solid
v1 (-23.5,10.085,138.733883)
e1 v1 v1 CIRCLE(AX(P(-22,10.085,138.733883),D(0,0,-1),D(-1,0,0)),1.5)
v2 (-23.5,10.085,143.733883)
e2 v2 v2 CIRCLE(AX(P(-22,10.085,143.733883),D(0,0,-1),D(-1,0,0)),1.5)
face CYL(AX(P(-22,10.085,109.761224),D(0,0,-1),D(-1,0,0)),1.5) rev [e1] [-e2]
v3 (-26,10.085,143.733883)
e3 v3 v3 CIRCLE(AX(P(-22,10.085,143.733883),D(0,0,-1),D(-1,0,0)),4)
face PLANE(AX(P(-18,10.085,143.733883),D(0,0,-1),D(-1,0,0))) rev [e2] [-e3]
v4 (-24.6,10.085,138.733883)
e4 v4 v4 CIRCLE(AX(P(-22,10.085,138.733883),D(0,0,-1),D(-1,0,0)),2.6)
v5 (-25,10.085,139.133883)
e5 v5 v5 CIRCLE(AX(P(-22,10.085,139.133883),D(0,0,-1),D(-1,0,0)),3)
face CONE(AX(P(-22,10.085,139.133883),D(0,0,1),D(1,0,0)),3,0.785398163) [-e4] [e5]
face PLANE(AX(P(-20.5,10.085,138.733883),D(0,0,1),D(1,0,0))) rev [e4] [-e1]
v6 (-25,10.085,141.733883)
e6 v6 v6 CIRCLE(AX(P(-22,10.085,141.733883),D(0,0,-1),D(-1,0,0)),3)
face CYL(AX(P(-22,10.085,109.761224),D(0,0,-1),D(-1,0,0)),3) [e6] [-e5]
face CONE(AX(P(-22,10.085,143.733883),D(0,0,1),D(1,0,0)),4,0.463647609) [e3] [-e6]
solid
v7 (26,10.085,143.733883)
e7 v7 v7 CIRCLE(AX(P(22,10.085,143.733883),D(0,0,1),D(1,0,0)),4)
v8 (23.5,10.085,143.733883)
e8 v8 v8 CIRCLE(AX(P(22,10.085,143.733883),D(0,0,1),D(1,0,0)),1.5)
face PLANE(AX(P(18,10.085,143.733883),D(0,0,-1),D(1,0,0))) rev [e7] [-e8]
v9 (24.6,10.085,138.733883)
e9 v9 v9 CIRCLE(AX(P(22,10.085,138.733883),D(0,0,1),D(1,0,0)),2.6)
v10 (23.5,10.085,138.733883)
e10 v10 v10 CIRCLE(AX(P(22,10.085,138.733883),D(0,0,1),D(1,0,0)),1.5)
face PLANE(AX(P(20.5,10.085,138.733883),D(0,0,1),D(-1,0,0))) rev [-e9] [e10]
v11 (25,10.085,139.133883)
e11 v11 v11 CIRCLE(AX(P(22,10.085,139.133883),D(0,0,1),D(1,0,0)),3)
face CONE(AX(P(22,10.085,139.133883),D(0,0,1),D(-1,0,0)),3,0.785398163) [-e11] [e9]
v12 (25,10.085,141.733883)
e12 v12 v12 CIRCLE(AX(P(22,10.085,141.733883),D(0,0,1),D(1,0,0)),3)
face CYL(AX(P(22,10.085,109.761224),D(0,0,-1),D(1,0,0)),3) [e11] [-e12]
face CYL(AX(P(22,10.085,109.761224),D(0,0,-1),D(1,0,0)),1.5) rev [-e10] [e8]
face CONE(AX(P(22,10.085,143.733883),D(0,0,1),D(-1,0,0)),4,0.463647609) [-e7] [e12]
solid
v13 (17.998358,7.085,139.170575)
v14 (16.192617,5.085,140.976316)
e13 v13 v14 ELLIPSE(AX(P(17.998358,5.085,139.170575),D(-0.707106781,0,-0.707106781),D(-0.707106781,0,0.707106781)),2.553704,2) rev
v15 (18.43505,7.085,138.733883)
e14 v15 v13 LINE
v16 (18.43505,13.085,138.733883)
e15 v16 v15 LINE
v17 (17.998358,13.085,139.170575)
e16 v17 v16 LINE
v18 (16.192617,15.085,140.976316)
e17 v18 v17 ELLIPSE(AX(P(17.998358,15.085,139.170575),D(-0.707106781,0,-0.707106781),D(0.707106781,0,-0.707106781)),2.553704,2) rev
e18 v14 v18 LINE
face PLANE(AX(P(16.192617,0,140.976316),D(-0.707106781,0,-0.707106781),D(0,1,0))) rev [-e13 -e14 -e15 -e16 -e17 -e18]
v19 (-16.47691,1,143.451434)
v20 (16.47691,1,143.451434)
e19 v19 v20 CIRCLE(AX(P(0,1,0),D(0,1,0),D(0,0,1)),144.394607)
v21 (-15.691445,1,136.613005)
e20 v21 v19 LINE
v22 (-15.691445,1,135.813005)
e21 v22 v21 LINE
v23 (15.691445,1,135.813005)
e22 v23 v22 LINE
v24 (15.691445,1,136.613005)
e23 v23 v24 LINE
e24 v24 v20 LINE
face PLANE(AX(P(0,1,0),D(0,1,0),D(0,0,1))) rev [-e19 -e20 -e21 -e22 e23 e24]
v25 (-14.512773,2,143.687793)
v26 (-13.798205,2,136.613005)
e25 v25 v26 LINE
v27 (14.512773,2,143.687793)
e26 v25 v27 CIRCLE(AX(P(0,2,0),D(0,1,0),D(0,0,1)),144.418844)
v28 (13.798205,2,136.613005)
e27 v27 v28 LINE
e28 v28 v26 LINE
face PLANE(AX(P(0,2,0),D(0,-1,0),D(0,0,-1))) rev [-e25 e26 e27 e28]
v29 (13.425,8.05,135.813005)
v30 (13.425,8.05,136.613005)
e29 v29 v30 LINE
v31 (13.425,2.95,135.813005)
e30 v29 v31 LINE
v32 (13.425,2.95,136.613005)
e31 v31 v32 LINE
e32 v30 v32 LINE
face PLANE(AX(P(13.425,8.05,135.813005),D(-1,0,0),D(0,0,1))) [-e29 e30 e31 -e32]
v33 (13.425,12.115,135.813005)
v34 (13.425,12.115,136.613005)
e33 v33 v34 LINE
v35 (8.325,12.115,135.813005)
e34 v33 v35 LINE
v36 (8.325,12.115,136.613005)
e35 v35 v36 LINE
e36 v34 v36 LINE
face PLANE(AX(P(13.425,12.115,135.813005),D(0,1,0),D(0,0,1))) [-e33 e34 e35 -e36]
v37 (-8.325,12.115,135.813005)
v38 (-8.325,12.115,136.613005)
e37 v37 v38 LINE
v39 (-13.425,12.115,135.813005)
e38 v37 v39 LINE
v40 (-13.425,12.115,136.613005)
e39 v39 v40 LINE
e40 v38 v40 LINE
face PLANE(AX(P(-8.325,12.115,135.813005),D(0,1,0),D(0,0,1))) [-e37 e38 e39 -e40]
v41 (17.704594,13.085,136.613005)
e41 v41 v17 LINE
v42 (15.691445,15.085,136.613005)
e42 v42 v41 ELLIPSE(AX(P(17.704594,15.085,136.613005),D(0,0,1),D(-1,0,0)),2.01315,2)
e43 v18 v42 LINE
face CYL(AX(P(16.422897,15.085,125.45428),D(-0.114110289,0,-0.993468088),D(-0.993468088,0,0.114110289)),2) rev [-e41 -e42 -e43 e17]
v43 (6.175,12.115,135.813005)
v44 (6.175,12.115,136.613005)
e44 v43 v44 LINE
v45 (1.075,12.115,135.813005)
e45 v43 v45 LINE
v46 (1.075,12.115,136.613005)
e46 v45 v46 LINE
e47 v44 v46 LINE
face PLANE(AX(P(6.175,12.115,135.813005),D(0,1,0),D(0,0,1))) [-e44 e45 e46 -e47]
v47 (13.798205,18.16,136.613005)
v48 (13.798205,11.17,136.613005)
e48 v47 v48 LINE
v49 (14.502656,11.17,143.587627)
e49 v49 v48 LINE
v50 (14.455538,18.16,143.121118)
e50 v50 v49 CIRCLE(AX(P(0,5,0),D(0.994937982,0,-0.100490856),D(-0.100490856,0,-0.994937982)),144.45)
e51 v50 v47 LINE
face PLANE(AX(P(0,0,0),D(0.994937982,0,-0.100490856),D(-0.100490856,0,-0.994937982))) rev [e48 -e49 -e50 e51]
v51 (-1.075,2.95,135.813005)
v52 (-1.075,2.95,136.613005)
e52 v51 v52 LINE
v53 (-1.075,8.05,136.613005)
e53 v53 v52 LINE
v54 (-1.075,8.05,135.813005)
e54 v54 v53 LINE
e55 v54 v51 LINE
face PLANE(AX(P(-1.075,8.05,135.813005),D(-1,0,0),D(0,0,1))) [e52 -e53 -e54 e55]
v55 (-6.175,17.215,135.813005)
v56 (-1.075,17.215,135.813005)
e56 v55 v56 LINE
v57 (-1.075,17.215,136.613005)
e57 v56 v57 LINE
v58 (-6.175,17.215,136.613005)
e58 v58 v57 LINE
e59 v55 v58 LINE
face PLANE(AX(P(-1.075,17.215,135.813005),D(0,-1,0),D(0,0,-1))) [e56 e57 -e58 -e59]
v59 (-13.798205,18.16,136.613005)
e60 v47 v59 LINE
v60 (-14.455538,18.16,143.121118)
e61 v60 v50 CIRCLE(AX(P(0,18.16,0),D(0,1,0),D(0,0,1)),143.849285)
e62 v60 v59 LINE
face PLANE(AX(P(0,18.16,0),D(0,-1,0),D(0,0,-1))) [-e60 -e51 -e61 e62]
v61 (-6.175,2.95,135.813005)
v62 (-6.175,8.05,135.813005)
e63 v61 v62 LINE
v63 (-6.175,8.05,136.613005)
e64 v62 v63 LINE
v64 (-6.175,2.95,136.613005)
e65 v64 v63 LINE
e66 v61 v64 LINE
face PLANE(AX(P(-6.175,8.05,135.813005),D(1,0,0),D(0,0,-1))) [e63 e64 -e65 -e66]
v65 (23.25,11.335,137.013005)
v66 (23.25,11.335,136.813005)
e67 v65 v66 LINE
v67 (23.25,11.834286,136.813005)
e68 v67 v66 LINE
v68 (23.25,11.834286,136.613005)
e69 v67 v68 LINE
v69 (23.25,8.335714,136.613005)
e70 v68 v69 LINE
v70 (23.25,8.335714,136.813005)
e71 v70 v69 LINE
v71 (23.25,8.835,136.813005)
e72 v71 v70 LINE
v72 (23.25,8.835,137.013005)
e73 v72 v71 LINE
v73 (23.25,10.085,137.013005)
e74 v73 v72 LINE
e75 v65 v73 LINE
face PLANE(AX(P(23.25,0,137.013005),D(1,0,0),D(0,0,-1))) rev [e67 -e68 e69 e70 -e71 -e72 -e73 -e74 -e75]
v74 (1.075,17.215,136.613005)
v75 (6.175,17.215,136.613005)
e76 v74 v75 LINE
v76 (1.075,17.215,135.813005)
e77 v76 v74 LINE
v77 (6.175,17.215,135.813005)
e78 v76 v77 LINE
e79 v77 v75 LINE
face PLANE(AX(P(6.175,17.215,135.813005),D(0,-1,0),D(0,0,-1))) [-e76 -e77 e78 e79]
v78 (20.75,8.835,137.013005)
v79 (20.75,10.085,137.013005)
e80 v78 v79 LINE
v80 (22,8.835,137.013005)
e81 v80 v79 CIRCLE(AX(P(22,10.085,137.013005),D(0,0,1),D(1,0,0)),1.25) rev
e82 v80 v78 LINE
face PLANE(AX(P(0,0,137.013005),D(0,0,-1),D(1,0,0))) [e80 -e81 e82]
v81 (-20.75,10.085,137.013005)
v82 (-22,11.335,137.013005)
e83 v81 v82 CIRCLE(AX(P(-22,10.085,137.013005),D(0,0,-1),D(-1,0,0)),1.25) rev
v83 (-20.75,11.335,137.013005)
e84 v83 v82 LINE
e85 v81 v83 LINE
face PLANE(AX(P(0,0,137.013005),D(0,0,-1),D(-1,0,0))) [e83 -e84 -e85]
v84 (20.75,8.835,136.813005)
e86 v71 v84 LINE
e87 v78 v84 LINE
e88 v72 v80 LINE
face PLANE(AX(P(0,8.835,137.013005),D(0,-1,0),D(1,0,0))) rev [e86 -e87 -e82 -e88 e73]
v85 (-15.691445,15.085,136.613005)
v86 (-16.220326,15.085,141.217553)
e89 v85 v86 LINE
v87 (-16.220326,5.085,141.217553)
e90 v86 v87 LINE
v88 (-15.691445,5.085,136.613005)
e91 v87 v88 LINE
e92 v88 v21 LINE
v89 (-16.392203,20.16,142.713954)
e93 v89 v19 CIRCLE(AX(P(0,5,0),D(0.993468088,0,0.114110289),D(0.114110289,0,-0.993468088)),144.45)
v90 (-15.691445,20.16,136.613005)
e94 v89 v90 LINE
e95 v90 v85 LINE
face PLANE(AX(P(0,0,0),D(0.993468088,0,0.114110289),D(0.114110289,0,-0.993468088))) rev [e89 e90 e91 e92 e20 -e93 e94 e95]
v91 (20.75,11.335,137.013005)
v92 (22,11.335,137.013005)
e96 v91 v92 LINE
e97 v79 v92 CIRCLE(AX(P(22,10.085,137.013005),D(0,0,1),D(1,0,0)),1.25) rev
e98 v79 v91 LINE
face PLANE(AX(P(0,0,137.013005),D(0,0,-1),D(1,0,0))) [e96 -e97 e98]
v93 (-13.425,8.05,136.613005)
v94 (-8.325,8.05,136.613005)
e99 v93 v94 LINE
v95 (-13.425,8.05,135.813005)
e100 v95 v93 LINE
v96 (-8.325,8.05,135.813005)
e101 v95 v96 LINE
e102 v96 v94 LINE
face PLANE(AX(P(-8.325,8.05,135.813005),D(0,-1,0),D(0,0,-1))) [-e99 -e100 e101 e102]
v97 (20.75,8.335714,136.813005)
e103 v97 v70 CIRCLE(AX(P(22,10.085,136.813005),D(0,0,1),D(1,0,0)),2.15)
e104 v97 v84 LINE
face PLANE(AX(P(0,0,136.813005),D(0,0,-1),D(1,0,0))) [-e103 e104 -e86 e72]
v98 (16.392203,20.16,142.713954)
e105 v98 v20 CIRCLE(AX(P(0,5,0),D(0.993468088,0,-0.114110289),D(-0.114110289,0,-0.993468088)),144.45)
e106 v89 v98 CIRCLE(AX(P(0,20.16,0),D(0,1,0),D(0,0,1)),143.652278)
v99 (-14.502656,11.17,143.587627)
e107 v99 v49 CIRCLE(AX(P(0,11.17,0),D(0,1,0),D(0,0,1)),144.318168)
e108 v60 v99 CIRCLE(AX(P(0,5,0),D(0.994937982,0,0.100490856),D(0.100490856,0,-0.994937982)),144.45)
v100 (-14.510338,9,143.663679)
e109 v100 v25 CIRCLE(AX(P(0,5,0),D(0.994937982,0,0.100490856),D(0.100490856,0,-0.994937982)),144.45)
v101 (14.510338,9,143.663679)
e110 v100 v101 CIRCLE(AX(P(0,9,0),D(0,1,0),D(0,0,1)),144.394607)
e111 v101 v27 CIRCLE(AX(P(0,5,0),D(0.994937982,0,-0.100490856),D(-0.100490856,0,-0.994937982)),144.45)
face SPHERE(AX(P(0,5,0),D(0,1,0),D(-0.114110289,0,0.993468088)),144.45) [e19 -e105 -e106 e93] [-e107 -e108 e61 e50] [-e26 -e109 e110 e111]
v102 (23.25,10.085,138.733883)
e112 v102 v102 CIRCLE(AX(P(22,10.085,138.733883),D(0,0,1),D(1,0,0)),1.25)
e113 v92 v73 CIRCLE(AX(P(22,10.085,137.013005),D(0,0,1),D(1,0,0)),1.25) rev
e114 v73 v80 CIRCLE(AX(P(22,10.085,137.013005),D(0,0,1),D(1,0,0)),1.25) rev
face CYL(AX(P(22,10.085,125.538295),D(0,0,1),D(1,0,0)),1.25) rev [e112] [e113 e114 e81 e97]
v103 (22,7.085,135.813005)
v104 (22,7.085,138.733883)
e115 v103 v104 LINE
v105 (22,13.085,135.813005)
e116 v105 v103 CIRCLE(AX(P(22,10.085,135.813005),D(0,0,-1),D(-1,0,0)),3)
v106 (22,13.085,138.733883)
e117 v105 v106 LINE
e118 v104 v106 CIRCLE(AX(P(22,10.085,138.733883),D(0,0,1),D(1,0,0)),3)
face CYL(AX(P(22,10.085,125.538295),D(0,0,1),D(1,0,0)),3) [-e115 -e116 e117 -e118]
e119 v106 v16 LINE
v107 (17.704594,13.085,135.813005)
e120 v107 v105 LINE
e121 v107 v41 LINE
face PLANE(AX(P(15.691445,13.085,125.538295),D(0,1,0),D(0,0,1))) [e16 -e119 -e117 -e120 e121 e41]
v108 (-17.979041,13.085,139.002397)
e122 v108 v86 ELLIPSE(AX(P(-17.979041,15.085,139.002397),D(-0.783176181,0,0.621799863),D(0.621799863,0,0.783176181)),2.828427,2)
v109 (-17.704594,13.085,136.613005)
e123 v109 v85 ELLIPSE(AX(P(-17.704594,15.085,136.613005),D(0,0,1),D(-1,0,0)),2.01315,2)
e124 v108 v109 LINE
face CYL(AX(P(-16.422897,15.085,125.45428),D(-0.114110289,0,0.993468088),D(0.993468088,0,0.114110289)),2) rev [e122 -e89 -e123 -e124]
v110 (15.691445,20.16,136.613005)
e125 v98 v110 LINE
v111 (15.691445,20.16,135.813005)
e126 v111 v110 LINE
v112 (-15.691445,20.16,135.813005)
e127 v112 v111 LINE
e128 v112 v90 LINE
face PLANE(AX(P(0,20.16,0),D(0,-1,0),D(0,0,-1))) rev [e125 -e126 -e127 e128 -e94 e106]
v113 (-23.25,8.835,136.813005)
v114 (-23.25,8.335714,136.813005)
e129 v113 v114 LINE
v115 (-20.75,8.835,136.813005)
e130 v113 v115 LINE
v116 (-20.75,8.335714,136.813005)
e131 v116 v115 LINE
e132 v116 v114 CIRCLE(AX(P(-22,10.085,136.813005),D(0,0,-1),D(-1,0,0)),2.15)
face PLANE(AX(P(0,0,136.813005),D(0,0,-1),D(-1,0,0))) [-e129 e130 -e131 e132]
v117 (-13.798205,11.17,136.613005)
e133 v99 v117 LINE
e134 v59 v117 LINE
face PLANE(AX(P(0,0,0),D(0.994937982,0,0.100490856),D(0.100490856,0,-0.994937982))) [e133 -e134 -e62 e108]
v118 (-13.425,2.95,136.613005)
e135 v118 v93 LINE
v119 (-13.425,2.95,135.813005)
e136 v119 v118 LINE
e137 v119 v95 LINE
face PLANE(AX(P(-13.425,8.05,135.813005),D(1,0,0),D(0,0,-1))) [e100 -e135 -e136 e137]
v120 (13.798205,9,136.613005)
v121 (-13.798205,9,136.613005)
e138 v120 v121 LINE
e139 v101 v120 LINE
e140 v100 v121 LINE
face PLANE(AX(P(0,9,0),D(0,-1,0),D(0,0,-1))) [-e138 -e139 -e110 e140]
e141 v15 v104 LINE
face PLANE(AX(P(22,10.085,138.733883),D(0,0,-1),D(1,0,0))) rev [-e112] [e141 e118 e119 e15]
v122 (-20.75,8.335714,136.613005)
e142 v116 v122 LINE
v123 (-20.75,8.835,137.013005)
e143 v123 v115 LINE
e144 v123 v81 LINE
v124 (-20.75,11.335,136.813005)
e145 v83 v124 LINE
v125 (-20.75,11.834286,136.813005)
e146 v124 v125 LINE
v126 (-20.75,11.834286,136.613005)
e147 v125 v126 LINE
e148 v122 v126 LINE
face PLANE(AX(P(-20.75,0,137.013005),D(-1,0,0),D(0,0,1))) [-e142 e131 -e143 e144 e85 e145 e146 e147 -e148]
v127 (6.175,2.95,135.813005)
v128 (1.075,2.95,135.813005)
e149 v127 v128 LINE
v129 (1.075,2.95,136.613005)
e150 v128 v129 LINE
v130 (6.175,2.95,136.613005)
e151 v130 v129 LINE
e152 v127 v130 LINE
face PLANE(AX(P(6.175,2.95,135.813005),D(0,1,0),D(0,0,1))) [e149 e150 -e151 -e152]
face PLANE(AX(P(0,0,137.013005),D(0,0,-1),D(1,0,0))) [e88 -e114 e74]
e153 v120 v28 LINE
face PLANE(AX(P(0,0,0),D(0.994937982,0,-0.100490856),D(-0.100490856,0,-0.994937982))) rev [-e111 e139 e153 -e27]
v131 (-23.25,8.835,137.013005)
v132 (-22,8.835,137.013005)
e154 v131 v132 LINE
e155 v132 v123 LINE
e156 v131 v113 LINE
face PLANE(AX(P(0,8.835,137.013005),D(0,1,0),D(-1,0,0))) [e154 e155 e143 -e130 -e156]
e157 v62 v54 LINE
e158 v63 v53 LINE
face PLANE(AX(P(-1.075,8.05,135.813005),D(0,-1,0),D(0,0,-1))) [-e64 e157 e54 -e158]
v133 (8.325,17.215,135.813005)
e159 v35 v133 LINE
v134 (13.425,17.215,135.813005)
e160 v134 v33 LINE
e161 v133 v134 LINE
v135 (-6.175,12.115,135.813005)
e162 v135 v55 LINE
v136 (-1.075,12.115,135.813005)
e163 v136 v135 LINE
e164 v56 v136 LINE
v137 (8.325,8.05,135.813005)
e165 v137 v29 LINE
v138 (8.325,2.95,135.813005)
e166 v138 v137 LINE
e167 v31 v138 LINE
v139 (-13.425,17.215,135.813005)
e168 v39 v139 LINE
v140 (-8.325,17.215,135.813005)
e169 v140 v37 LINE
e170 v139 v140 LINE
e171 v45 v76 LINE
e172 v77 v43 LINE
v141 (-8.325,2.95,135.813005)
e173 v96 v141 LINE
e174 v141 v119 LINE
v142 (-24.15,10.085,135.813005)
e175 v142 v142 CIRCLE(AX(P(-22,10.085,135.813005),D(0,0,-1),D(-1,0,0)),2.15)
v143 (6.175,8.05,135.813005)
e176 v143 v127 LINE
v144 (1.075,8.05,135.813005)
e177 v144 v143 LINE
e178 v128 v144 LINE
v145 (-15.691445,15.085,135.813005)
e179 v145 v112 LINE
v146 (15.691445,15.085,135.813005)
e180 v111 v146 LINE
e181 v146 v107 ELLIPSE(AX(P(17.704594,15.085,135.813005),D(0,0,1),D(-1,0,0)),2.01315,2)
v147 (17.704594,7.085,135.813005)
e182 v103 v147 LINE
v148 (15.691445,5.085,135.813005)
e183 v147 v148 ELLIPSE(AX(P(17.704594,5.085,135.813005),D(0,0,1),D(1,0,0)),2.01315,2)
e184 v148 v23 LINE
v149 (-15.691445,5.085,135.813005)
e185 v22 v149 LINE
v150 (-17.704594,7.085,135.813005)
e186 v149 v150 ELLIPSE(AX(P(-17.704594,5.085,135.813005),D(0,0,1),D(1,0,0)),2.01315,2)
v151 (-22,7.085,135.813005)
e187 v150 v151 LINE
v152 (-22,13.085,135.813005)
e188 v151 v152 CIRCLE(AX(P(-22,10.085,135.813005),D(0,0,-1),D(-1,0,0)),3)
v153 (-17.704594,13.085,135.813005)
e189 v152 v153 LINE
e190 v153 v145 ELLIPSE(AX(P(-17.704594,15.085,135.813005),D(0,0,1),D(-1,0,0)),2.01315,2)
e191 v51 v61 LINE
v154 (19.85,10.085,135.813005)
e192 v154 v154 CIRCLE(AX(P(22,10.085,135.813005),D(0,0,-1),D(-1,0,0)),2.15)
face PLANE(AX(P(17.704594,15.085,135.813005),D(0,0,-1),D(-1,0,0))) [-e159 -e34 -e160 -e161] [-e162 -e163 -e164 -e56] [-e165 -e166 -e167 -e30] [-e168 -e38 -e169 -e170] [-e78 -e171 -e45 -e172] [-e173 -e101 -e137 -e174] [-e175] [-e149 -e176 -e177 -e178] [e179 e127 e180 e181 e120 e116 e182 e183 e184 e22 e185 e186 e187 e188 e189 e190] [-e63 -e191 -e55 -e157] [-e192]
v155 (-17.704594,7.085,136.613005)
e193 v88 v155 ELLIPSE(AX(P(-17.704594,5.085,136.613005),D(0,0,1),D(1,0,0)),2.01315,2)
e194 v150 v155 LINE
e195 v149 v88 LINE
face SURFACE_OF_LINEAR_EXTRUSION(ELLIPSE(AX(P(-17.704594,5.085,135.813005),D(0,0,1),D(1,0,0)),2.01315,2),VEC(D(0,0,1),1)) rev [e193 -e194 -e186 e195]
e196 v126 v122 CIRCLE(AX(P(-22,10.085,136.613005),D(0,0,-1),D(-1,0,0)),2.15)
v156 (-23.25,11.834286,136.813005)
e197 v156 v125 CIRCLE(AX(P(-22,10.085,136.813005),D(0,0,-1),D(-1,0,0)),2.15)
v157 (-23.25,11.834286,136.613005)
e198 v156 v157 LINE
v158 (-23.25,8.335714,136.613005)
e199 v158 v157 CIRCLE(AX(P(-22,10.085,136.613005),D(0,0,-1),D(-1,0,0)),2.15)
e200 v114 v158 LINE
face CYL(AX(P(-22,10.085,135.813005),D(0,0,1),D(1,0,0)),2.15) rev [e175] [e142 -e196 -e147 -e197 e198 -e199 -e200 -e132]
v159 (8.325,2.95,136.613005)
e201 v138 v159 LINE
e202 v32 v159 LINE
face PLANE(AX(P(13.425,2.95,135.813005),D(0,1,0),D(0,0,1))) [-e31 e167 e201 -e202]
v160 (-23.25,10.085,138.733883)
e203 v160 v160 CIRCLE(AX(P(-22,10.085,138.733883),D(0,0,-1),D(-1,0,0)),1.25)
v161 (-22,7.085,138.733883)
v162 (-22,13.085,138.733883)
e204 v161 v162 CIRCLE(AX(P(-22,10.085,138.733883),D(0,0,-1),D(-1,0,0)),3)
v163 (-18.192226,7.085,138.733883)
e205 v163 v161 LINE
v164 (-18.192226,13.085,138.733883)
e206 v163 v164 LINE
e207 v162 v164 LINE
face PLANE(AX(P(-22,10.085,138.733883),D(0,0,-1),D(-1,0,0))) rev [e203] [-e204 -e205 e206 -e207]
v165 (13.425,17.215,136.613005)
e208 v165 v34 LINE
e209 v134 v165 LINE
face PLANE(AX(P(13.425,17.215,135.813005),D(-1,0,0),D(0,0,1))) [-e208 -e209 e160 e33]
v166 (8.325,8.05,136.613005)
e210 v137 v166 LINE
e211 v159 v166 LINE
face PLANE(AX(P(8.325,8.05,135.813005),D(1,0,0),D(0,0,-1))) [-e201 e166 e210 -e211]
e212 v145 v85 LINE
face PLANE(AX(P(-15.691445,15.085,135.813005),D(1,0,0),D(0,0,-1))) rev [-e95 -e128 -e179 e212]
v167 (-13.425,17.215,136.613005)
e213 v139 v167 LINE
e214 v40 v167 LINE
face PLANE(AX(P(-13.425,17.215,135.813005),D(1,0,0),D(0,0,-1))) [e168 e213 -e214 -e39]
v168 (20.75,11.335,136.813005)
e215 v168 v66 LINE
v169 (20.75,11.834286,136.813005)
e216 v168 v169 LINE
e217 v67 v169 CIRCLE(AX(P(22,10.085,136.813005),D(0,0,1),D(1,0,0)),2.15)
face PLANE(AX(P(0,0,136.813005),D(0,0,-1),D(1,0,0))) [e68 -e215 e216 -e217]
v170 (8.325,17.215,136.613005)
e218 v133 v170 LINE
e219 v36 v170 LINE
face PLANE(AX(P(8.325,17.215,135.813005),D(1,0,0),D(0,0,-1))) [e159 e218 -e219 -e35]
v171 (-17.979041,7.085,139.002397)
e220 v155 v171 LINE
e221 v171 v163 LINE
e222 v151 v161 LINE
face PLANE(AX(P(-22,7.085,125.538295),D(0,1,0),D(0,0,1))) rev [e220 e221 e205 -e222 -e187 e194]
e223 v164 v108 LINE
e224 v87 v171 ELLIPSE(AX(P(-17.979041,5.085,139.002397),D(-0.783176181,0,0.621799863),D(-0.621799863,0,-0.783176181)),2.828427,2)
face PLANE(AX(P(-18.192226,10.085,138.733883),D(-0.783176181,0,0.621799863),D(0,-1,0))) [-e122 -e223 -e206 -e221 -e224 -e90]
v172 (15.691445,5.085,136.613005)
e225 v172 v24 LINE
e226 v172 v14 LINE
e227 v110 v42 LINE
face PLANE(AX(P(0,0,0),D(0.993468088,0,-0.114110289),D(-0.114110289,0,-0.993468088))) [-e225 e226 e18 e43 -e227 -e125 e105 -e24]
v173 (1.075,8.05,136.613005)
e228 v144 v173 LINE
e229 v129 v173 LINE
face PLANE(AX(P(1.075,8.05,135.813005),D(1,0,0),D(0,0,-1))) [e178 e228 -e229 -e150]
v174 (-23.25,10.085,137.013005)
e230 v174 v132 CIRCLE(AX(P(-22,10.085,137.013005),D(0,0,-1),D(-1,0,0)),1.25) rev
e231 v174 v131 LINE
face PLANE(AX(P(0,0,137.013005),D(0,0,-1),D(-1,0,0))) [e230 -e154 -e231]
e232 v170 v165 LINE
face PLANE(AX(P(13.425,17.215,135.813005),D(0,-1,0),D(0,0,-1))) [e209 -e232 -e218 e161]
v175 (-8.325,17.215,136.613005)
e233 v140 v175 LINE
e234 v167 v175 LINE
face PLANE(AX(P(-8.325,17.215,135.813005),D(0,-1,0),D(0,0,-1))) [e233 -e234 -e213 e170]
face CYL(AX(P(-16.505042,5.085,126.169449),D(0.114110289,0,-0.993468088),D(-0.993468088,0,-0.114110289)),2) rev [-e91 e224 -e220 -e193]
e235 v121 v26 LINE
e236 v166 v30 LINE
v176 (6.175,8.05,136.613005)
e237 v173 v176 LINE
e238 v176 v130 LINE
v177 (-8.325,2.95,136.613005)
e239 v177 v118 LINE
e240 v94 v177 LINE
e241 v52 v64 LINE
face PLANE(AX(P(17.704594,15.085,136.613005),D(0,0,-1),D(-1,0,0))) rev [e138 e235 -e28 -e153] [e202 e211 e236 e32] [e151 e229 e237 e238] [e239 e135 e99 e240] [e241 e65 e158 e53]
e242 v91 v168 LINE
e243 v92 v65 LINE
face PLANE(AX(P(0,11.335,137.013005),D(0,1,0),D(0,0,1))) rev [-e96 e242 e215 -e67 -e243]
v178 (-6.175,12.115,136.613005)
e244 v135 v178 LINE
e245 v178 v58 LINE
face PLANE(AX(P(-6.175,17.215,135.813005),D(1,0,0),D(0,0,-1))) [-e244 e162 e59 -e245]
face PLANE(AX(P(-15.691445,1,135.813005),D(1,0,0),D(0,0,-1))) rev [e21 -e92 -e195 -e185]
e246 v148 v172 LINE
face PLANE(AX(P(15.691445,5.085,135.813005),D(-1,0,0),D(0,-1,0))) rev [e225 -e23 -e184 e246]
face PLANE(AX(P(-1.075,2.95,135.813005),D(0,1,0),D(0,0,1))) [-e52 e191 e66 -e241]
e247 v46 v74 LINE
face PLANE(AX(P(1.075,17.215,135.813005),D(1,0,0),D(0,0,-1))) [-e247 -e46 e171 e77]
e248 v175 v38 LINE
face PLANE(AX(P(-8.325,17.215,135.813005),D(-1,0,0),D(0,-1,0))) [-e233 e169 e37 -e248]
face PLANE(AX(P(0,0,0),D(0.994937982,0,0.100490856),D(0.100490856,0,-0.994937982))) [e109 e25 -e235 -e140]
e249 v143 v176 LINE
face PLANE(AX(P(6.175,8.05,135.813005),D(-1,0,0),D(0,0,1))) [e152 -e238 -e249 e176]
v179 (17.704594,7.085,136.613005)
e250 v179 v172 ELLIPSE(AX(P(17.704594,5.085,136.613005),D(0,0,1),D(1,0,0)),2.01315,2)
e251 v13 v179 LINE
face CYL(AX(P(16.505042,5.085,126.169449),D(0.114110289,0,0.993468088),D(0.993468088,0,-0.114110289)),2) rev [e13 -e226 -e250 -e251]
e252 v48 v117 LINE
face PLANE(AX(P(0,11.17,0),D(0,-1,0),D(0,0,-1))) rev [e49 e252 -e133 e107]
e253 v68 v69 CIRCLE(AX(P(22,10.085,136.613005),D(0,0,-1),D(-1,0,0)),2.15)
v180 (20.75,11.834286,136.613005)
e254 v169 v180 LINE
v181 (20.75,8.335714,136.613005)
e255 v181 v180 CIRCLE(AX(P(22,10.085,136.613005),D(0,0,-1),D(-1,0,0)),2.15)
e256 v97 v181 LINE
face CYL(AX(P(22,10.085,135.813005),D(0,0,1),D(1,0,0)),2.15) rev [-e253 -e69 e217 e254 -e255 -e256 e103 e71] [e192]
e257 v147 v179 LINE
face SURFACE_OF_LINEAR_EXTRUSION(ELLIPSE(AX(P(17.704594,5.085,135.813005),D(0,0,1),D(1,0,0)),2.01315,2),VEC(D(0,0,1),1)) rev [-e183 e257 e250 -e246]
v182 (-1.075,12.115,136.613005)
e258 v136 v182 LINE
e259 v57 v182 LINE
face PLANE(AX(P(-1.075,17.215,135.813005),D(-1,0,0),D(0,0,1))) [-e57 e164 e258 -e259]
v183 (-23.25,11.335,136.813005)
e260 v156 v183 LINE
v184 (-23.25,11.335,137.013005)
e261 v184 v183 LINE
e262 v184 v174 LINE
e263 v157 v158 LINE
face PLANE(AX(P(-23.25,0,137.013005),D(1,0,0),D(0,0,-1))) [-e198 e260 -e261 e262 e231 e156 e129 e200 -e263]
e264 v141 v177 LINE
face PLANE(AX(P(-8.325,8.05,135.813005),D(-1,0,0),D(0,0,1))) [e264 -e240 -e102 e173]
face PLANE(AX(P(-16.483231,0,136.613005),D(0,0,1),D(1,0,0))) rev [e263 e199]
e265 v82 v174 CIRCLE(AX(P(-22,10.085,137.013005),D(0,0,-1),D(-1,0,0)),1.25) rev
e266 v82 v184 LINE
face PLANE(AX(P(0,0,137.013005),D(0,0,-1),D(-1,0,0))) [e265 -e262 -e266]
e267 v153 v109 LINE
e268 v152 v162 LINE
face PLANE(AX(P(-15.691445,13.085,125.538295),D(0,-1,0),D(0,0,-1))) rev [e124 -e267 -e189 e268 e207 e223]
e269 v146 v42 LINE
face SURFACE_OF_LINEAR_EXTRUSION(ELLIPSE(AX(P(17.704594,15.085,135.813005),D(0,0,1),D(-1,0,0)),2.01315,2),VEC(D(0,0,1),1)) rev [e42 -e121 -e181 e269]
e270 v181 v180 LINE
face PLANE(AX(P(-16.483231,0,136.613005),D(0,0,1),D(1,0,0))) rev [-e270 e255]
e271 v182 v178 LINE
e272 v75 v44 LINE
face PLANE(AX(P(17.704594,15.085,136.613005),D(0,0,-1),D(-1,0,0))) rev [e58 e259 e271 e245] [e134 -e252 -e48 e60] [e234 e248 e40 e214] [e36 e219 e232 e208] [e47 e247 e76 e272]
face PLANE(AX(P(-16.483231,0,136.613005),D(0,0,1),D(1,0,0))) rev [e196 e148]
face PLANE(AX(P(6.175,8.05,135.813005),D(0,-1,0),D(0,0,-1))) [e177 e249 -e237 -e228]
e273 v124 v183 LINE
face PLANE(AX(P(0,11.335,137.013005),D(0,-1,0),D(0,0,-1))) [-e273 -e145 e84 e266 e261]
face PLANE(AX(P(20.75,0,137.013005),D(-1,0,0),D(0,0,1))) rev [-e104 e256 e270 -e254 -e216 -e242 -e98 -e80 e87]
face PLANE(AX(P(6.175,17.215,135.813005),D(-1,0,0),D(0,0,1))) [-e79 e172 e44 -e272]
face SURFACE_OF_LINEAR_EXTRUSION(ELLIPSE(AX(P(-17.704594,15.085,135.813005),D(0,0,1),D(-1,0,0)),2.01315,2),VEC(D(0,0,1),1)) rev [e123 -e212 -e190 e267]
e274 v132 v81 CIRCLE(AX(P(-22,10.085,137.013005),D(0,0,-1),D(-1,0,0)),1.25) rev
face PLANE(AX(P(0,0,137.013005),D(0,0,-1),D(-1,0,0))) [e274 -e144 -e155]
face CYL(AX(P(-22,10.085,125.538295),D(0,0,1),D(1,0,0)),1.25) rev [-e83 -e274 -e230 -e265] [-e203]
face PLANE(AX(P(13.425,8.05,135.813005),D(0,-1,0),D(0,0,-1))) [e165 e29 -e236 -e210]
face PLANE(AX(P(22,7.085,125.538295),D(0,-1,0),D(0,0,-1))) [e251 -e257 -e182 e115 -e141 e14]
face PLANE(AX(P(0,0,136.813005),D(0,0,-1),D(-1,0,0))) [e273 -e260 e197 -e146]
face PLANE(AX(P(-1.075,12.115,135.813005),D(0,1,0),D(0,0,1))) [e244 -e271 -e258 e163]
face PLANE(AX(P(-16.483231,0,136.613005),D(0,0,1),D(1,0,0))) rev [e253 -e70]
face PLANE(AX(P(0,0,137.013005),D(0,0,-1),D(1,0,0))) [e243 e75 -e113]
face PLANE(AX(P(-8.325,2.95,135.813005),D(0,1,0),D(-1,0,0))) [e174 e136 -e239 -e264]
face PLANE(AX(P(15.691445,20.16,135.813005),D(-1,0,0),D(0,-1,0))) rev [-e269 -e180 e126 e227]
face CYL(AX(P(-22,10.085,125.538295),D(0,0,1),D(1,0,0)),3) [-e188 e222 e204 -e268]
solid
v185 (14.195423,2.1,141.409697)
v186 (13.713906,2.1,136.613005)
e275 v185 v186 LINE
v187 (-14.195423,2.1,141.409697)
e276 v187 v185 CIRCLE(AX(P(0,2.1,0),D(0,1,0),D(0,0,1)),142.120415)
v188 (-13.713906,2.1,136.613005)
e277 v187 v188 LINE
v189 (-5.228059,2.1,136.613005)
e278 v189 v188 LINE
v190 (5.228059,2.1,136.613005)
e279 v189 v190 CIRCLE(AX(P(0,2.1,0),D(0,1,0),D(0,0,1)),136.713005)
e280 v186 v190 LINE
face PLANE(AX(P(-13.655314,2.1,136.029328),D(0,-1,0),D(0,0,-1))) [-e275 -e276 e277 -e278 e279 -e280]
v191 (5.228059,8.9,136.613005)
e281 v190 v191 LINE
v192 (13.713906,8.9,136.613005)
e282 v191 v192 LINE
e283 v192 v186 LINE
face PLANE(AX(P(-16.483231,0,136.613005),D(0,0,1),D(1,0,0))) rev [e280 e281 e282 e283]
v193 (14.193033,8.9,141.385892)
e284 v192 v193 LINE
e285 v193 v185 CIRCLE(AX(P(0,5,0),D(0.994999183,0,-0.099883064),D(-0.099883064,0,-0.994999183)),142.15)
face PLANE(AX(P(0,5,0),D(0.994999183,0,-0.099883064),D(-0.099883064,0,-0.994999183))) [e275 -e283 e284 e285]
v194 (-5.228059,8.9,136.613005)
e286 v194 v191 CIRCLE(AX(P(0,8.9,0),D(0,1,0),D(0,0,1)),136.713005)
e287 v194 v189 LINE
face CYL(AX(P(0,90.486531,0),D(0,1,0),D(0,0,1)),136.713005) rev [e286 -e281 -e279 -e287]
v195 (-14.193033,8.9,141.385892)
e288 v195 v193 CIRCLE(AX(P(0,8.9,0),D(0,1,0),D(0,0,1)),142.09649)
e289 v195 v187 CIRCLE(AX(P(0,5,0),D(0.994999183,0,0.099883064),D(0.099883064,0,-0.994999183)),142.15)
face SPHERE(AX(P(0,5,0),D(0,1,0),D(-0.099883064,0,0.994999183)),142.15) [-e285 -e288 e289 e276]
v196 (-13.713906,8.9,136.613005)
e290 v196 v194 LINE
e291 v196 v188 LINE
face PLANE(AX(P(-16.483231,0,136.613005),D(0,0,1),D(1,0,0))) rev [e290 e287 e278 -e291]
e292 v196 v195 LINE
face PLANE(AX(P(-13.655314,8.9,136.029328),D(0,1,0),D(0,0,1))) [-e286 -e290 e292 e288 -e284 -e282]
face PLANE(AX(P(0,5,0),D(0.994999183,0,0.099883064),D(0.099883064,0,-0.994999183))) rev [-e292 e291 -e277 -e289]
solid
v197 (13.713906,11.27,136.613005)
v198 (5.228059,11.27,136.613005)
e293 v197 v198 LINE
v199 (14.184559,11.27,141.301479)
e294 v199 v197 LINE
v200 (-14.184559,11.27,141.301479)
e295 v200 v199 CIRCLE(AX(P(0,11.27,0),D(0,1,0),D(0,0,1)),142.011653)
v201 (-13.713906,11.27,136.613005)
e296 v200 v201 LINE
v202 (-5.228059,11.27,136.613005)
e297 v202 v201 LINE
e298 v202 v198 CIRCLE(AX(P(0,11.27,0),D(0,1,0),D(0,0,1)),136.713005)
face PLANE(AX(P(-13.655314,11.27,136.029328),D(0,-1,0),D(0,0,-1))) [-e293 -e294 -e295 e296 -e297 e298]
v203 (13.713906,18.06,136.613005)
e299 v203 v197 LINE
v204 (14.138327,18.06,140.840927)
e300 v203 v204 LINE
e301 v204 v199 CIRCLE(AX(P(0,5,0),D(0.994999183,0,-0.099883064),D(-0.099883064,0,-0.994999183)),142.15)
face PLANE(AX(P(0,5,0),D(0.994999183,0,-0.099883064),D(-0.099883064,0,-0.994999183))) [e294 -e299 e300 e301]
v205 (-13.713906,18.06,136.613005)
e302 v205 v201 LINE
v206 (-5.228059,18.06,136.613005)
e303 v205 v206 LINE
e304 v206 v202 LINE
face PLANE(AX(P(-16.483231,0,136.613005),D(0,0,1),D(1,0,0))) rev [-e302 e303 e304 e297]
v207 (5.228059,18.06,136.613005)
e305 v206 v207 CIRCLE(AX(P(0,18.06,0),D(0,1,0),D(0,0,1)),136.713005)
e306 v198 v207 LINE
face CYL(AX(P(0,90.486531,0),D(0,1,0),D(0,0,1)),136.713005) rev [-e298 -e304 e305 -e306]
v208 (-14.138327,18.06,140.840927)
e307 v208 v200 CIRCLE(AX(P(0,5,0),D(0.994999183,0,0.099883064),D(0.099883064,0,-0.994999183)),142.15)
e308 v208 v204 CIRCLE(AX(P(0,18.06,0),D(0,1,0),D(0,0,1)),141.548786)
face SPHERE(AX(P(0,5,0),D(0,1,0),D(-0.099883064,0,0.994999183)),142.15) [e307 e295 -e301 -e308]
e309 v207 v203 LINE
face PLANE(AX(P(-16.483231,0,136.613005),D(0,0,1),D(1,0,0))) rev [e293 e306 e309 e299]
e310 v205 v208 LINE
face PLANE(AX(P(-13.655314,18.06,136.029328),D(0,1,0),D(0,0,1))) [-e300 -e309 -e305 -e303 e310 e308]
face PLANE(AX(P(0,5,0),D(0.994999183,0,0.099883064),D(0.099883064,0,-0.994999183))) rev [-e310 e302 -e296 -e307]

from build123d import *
from OCP.BRepFilletAPI import BRepFilletAPI_MakeChamfer

# Parameters (mm, degrees)
REVOLVE1_ANGLE          = 13.104621076
CUT_REVOLVE1_ANGLE      = 11.534873692
REVOLVE4_ANGLE          = 11.464873692
CUT_EXTRUDE2_START      = -15.691444559
CUT_EXTRUDE2_OUTLINE_W  = 22.613004813
CUT_EXTRUDE2_OUTLINE_H  = 19.16
CUT_EXTRUDE2_DEPTH      = 31.382889118
BOSS_EXTRUDE3_OUTLINE_R = 1.25
BOSS_EXTRUDE3_DEPTH     = 2.120878311
FILLET1_R               = 2
CHAMFER2_SIZE           = 2.5
CHAMFER2_SIZE2          = 2.257176605
SKETCH11_R              = 2.15
BOSS_EXTRUDE4_DEPTH     = 0.8
CUT_EXTRUDE5_START      = -0.4
CUT_EXTRUDE5_DEPTH      = 0.4
CUT_EXTRUDE6_START      = 136.613004813
CUT_EXTRUDE6_DEPTH      = 0.2
SKETCH13_W              = 5.1
SKETCH13_H              = 5.1
CUT_EXTRUDE7_DEPTH      = 0.8


# Read off the part's stored shape, not the designer's step: Cut-Extrude2, Boss-Extrude3, Cut-Extrude6
with BuildPart() as part:
    # Sketch2 → Revolve1 (revolve, symmetric)
    with BuildSketch(Plane(origin=(0, 0, 0), x_dir=(0, 0, -1), z_dir=(1, 0, 0))) as revolve1_sk:
        with BuildLine():
            Line((-144.394606894, 1), (-116.613004813, 1))
            Line((-116.613004813, 1), (-116.613004813, 20.16))
            Line((-116.613004813, 20.16), (-143.65227774, 20.16))
            ThreePointArc((-143.65227774, 20.16), (-144.341706852, 10.592330743), (-144.394606894, 1))
        make_face()
    revolve(axis=Axis((0, 110.183531328, 0), (0, -1, 0)), revolution_arc=REVOLVE1_ANGLE / 2)
    revolve(revolve1_sk.sketch, axis=Axis((0, 110.183531328, 0), (0, 1, 0)), revolution_arc=REVOLVE1_ANGLE / 2)

    # Sketch2<3> → Cut-Revolve1 (revolve, symmetric, cut)
    with BuildSketch(Plane(origin=(0, 0, 0), x_dir=(0, 0, -1), z_dir=(1, 0, 0))) as cut_revolve1_sk:
        with BuildLine():
            ThreePointArc((-143.849285365, 18.16), (-144.126109058, 14.667842971), (-144.318167948, 11.17))
            Line((-144.318167948, 11.17), (-137.31303574, 11.17))
            ThreePointArc((-137.31303574, 11.17), (-137.111143693, 14.668141466), (-136.820148677, 18.16))
            Line((-136.820148677, 18.16), (-143.849285365, 18.16))
        make_face()
        with BuildLine():
            ThreePointArc((-144.394606894, 9), (-144.449134138, 5.500146838), (-144.418843992, 2))
            Line((-144.418843992, 2), (-137.418843992, 2))
            ThreePointArc((-137.418843992, 2), (-137.450676688, 5.500162179), (-137.393372053, 9))
            Line((-137.393372053, 9), (-144.394606894, 9))
        make_face()
        with BuildLine():
            ThreePointArc((-136.820148677, 18.16), (-137.111143693, 14.668141466), (-137.31303574, 11.17))
            Line((-137.31303574, 11.17), (-136.613004813, 11.17))
            Line((-136.613004813, 11.17), (-136.613004813, 18.16))
            Line((-136.613004813, 18.16), (-136.820148677, 18.16))
        make_face()
        with BuildLine():
            ThreePointArc((-137.393372053, 9), (-137.450676688, 5.500162179), (-137.418843992, 2))
            Line((-137.418843992, 2), (-136.613004813, 2))
            Line((-136.613004813, 2), (-136.613004813, 9))
            Line((-136.613004813, 9), (-137.393372053, 9))
        make_face()
    revolve(axis=Axis((0, 110.183531328, 0), (0, -1, 0)), revolution_arc=CUT_REVOLVE1_ANGLE / 2, mode=Mode.SUBTRACT)
    revolve(cut_revolve1_sk.sketch, axis=Axis((0, 110.183531328, 0), (0, 1, 0)), revolution_arc=CUT_REVOLVE1_ANGLE / 2, mode=Mode.SUBTRACT)


with BuildPart() as body_2:
    # Sketch10 → Revolve4 (revolve, symmetric)
    with BuildSketch(Plane(origin=(0, 0, 0), x_dir=(0, 0, -1), z_dir=(1, 0, 0))) as revolve4_sk:
        with BuildLine():
            Line((-136.713004813, 18.06), (-141.548786289, 18.06))
            ThreePointArc((-141.548786289, 18.06), (-141.820861348, 14.667770498), (-142.011653043, 11.27))
            Line((-142.011653043, 11.27), (-136.713004813, 11.27))
            Line((-136.713004813, 11.27), (-136.713004813, 18.06))
        make_face()
        with BuildLine():
            Line((-136.713004813, 8.9), (-142.096490104, 8.9))
            ThreePointArc((-142.096490104, 8.9), (-142.149120141, 5.500143086), (-142.120415493, 2.1))
            Line((-142.120415493, 2.1), (-136.713004813, 2.1))
            Line((-136.713004813, 2.1), (-136.713004813, 8.9))
        make_face()
    revolve(axis=Axis((0, 90.486530569, 0), (0, -1, 0)), revolution_arc=REVOLVE4_ANGLE / 2)
    revolve(revolve4_sk.sketch, axis=Axis((0, 90.486530569, 0), (0, 1, 0)), revolution_arc=REVOLVE4_ANGLE / 2)


with BuildPart() as cut_extrude2_tool:
    # Cut-Extrude2 outline → Cut-Extrude2 (new body)
    with BuildSketch(Plane(origin=(0, 0, 0), x_dir=(0, 0, -1), z_dir=(1, 0, 0)).offset(CUT_EXTRUDE2_START)):
        with Locations((-125.306502407, 10.58)):
            Rectangle(CUT_EXTRUDE2_OUTLINE_W, CUT_EXTRUDE2_OUTLINE_H)
    extrude(amount=CUT_EXTRUDE2_DEPTH)


with BuildPart() as part_1:
    add(part.part)

    # Cut-Extrude2: cut by cut_extrude2_tool
    add(cut_extrude2_tool.part, mode=Mode.SUBTRACT)

    # Boss-Extrude3 outline → Boss-Extrude3 (add)
    with BuildSketch(Plane(origin=(0, 0, 138.733883125), x_dir=(-1, 0, 0), z_dir=(0, 0, -1))):
        with BuildLine():
            Line((22, 13.085), (15.691444559, 13.085))
            Line((15.691444559, 13.085), (15.691444559, 7.085))
            Line((15.691444559, 7.085), (22, 7.085))
            ThreePointArc((22, 7.085), (25, 10.085), (22, 13.085))
        make_face()
        with Locations((22, 10.085)):
            Circle(BOSS_EXTRUDE3_OUTLINE_R, mode=Mode.SUBTRACT)
    boss_extrude3 = extrude(amount=BOSS_EXTRUDE3_DEPTH)

    # Mirror7: Boss-Extrude3 across plane
    add(boss_extrude3.mirror(Plane(origin=(0, 0, 0), x_dir=(0, 0, 1), z_dir=(1, 0, 0))))

    # Fillet1
    fillet1_edges = [part_1.edges().sort_by_distance(p)[0] for p in [
        (-15.813247182, 13.085, 137.673443969),
        (-15.813247182, 7.085, 137.673443969),
        (15.813247182, 13.085, 137.673443969),
        (15.813247182, 7.085, 137.673443969),
    ]]
    fillet(fillet1_edges, radius=FILLET1_R)

    # Chamfer2: one chamfer whose edges measure the first distance from different faces: ONE call of the kernel's chamfer builder (chamfer() names one face for all edges)
    chamfer2_edges_1 = [part_1.edges().sort_by_distance(p)[0] for p in [
        (-15.935049804, 10.085, 138.733883125),
    ]]
    chamfer2_side_1 = [part_1.faces().sort_by_distance(p)[0] for p in [
        (-16.127692214, 10.467235717, 140.411068316),
    ]]
    chamfer2_edges_2 = [part_1.edges().sort_by_distance(p)[0] for p in [
        (15.935049804, 10.085, 138.733883125),
    ]]
    chamfer2_side_2 = [part_1.faces().sort_by_distance(p)[0] for p in [
        (19.844503511, 10.085, 138.733883125),
    ]]
    chamfer2 = BRepFilletAPI_MakeChamfer(part_1.part.solid().wrapped)
    for e in chamfer2_edges_1:
        chamfer2.Add(CHAMFER2_SIZE, CHAMFER2_SIZE2, e.wrapped, chamfer2_side_1[0].wrapped)  # the first distance lies on this face
    for e in chamfer2_edges_2:
        chamfer2.Add(CHAMFER2_SIZE, CHAMFER2_SIZE2, e.wrapped, chamfer2_side_2[0].wrapped)  # the first distance lies on this face
    add(Compound.cast(chamfer2.Shape()), mode=Mode.REPLACE)

    # Sketch11 → Boss-Extrude4 (add)
    with BuildSketch(Plane(origin=(0, 0, 136.613004813), x_dir=(-1, 0, 0), z_dir=(0, 0, -1))):
        with BuildLine():
            Line((15.691444559, 20.16), (-15.691444559, 20.16))
            Line((-15.691444559, 20.16), (-15.691444559, 15.085))
            add(Edge.make_bspline(
                [(-17.704594276, 13.085), (-15.691444559, 13.085), (-15.691444559, 15.085)],
                knots=[4.71238898, 4.71238898, 4.71238898, 6.283185307, 6.283185307, 6.283185307], degree=2, weights=[1, 0.707106781, 1]))
            Line((-17.704594276, 13.085), (-22, 13.085))
            ThreePointArc((-22, 13.085), (-25, 10.085), (-22, 7.085))
            Line((-22, 7.085), (-17.704594276, 7.085))
            add(Edge.make_bspline(
                [(-15.691444559, 5.085), (-15.691444559, 7.085), (-17.704594276, 7.085)],
                knots=[3.141592654, 3.141592654, 3.141592654, 4.71238898, 4.71238898, 4.71238898], degree=2, weights=[1, 0.707106781, 1]))
            Line((-15.691444559, 5.085), (-15.691444559, 1))
            Line((-15.691444559, 1), (15.691444559, 1))
            Line((15.691444559, 1), (15.691444559, 5.085))
            add(Edge.make_bspline(
                [(17.704594276, 7.085), (15.691444559, 7.085), (15.691444559, 5.085)],
                knots=[4.71238898, 4.71238898, 4.71238898, 6.283185307, 6.283185307, 6.283185307], degree=2, weights=[1, 0.707106781, 1]))
            Line((17.704594276, 7.085), (22, 7.085))
            ThreePointArc((22, 7.085), (25, 10.085), (22, 13.085))
            Line((22, 13.085), (17.704594276, 13.085))
            add(Edge.make_bspline(
                [(15.691444559, 15.085), (15.691444559, 13.085), (17.704594276, 13.085)],
                knots=[3.141592654, 3.141592654, 3.141592654, 4.71238898, 4.71238898, 4.71238898], degree=2, weights=[1, 0.707106781, 1]))
            Line((15.691444559, 15.085), (15.691444559, 20.16))
        make_face()
        with Locations((-22, 10.085)):
            Circle(SKETCH11_R, mode=Mode.SUBTRACT)
        with Locations((22, 10.085)):
            Circle(SKETCH11_R, mode=Mode.SUBTRACT)
    extrude(amount=BOSS_EXTRUDE4_DEPTH)

    # Sketch12 → Cut-Extrude5 (cut)
    with BuildSketch(Plane(origin=(0, 0, 136.613004813), x_dir=(-1, 0, 0), z_dir=(0, 0, -1)).offset(CUT_EXTRUDE5_START)):
        with BuildLine():
            ThreePointArc((20.75, 10.085), (21.116116524, 10.968883476), (22, 11.335))
            Line((22, 11.335), (20.75, 11.335))
            Line((20.75, 11.335), (20.75, 10.085))
        make_face()
        with BuildLine():
            Line((23.25, 10.085), (23.25, 11.335))
            Line((23.25, 11.335), (22, 11.335))
            ThreePointArc((22, 11.335), (22.883883476, 10.968883476), (23.25, 10.085))
        make_face()
        with BuildLine():
            Line((23.25, 8.835), (23.25, 10.085))
            ThreePointArc((23.25, 10.085), (22.883883476, 9.201116524), (22, 8.835))
            Line((22, 8.835), (23.25, 8.835))
        make_face()
        with BuildLine():
            Line((20.75, 8.835), (22, 8.835))
            ThreePointArc((22, 8.835), (21.116116524, 9.201116524), (20.75, 10.085))
            Line((20.75, 10.085), (20.75, 8.835))
        make_face()
    cut_extrude5 = extrude(amount=CUT_EXTRUDE5_DEPTH, mode=Mode.SUBTRACT)

    # Cut-Extrude6 outline → Cut-Extrude6 (cut)
    with BuildSketch(Plane.XY.offset(CUT_EXTRUDE6_START)):
        with BuildLine():
            Line((-20.75, 11.335), (-20.75, 11.834285568))
            ThreePointArc((-20.75, 11.834285568), (-22, 12.235), (-23.25, 11.834285568))
            Line((-23.25, 11.834285568), (-23.25, 11.335))
            Line((-23.25, 11.335), (-20.75, 11.335))
        make_face()
        with BuildLine():
            ThreePointArc((-23.25, 8.335714432), (-22, 7.935), (-20.75, 8.335714432))
            Line((-20.75, 8.335714432), (-20.75, 8.835))
            Line((-20.75, 8.835), (-23.25, 8.835))
            Line((-23.25, 8.835), (-23.25, 8.335714432))
        make_face()
    cut_extrude6 = extrude(amount=CUT_EXTRUDE6_DEPTH, mode=Mode.SUBTRACT)

    # Mirror12: Cut-Extrude5, Cut-Extrude6, Cut-Extrude6 across plane
    add(cut_extrude5.mirror(Plane(origin=(0, 0, 0), x_dir=(0, 0, 1), z_dir=(1, 0, 0))), mode=Mode.SUBTRACT)
    add(cut_extrude6.mirror(Plane(origin=(0, 0, 0), x_dir=(0, 0, 1), z_dir=(1, 0, 0))), mode=Mode.SUBTRACT)
    add(cut_extrude6.mirror(Plane(origin=(0, 0, 0), x_dir=(0, 0, 1), z_dir=(1, 0, 0))), mode=Mode.SUBTRACT)

    # Sketch13 → Cut-Extrude7 (cut)
    with BuildSketch(Plane(origin=(0, 0, 136.613004813), x_dir=(-1, 0, 0), z_dir=(0, 0, -1))):
        with Locations((-10.875, 14.665)):
            Rectangle(SKETCH13_W, SKETCH13_H)
        with Locations((-10.875, 5.5)):
            Rectangle(SKETCH13_W, SKETCH13_H)
        with Locations((-3.625, 5.5)):
            Rectangle(SKETCH13_W, SKETCH13_H)
        with Locations((-3.625, 14.665)):
            Rectangle(SKETCH13_W, SKETCH13_H)
        with Locations((3.625, 14.665)):
            Rectangle(SKETCH13_W, SKETCH13_H)
        with Locations((10.875, 14.665)):
            Rectangle(SKETCH13_W, SKETCH13_H)
        with Locations((10.875, 5.5)):
            Rectangle(SKETCH13_W, SKETCH13_H)
        with Locations((3.625, 5.5)):
            Rectangle(SKETCH13_W, SKETCH13_H)
    extrude(amount=CUT_EXTRUDE7_DEPTH, mode=Mode.SUBTRACT)


with BuildPart() as body_2_1:
    add(body_2.part)

    # Cut-Extrude2: cut by cut_extrude2_tool
    add(cut_extrude2_tool.part, mode=Mode.SUBTRACT)


with BuildPart() as body_3:
    # Sketch6 → Revolve3 (revolve)
    with BuildSketch(Plane(origin=(0, 10.085, 0), x_dir=(1, 0, 0), z_dir=(0, 1, 0)), mode=Mode.PRIVATE) as revolve3_sk:
        Polygon((-20.5, -138.733883125), (-19.4, -138.733883125), (-19, -139.133883125), (-19, -141.733883125), (-18, -143.733883125), (-20.5, -143.733883125), align=None)
    revolve(revolve3_sk.sketch.rotate(Axis((-22, 10.085, 109.761224365), (0, 0, 1)), 180), axis=Axis((-22, 10.085, 109.761224365), (0, 0, 1)))


with BuildPart() as body_4:
    # Mirror11: mirrored copy
    add(body_3.part.mirror(Plane(origin=(0, 0, 0), x_dir=(0, 0, 1), z_dir=(1, 0, 0))))


solid = Compound([part_1.part, body_2_1.part, body_3.part, body_4.part])
